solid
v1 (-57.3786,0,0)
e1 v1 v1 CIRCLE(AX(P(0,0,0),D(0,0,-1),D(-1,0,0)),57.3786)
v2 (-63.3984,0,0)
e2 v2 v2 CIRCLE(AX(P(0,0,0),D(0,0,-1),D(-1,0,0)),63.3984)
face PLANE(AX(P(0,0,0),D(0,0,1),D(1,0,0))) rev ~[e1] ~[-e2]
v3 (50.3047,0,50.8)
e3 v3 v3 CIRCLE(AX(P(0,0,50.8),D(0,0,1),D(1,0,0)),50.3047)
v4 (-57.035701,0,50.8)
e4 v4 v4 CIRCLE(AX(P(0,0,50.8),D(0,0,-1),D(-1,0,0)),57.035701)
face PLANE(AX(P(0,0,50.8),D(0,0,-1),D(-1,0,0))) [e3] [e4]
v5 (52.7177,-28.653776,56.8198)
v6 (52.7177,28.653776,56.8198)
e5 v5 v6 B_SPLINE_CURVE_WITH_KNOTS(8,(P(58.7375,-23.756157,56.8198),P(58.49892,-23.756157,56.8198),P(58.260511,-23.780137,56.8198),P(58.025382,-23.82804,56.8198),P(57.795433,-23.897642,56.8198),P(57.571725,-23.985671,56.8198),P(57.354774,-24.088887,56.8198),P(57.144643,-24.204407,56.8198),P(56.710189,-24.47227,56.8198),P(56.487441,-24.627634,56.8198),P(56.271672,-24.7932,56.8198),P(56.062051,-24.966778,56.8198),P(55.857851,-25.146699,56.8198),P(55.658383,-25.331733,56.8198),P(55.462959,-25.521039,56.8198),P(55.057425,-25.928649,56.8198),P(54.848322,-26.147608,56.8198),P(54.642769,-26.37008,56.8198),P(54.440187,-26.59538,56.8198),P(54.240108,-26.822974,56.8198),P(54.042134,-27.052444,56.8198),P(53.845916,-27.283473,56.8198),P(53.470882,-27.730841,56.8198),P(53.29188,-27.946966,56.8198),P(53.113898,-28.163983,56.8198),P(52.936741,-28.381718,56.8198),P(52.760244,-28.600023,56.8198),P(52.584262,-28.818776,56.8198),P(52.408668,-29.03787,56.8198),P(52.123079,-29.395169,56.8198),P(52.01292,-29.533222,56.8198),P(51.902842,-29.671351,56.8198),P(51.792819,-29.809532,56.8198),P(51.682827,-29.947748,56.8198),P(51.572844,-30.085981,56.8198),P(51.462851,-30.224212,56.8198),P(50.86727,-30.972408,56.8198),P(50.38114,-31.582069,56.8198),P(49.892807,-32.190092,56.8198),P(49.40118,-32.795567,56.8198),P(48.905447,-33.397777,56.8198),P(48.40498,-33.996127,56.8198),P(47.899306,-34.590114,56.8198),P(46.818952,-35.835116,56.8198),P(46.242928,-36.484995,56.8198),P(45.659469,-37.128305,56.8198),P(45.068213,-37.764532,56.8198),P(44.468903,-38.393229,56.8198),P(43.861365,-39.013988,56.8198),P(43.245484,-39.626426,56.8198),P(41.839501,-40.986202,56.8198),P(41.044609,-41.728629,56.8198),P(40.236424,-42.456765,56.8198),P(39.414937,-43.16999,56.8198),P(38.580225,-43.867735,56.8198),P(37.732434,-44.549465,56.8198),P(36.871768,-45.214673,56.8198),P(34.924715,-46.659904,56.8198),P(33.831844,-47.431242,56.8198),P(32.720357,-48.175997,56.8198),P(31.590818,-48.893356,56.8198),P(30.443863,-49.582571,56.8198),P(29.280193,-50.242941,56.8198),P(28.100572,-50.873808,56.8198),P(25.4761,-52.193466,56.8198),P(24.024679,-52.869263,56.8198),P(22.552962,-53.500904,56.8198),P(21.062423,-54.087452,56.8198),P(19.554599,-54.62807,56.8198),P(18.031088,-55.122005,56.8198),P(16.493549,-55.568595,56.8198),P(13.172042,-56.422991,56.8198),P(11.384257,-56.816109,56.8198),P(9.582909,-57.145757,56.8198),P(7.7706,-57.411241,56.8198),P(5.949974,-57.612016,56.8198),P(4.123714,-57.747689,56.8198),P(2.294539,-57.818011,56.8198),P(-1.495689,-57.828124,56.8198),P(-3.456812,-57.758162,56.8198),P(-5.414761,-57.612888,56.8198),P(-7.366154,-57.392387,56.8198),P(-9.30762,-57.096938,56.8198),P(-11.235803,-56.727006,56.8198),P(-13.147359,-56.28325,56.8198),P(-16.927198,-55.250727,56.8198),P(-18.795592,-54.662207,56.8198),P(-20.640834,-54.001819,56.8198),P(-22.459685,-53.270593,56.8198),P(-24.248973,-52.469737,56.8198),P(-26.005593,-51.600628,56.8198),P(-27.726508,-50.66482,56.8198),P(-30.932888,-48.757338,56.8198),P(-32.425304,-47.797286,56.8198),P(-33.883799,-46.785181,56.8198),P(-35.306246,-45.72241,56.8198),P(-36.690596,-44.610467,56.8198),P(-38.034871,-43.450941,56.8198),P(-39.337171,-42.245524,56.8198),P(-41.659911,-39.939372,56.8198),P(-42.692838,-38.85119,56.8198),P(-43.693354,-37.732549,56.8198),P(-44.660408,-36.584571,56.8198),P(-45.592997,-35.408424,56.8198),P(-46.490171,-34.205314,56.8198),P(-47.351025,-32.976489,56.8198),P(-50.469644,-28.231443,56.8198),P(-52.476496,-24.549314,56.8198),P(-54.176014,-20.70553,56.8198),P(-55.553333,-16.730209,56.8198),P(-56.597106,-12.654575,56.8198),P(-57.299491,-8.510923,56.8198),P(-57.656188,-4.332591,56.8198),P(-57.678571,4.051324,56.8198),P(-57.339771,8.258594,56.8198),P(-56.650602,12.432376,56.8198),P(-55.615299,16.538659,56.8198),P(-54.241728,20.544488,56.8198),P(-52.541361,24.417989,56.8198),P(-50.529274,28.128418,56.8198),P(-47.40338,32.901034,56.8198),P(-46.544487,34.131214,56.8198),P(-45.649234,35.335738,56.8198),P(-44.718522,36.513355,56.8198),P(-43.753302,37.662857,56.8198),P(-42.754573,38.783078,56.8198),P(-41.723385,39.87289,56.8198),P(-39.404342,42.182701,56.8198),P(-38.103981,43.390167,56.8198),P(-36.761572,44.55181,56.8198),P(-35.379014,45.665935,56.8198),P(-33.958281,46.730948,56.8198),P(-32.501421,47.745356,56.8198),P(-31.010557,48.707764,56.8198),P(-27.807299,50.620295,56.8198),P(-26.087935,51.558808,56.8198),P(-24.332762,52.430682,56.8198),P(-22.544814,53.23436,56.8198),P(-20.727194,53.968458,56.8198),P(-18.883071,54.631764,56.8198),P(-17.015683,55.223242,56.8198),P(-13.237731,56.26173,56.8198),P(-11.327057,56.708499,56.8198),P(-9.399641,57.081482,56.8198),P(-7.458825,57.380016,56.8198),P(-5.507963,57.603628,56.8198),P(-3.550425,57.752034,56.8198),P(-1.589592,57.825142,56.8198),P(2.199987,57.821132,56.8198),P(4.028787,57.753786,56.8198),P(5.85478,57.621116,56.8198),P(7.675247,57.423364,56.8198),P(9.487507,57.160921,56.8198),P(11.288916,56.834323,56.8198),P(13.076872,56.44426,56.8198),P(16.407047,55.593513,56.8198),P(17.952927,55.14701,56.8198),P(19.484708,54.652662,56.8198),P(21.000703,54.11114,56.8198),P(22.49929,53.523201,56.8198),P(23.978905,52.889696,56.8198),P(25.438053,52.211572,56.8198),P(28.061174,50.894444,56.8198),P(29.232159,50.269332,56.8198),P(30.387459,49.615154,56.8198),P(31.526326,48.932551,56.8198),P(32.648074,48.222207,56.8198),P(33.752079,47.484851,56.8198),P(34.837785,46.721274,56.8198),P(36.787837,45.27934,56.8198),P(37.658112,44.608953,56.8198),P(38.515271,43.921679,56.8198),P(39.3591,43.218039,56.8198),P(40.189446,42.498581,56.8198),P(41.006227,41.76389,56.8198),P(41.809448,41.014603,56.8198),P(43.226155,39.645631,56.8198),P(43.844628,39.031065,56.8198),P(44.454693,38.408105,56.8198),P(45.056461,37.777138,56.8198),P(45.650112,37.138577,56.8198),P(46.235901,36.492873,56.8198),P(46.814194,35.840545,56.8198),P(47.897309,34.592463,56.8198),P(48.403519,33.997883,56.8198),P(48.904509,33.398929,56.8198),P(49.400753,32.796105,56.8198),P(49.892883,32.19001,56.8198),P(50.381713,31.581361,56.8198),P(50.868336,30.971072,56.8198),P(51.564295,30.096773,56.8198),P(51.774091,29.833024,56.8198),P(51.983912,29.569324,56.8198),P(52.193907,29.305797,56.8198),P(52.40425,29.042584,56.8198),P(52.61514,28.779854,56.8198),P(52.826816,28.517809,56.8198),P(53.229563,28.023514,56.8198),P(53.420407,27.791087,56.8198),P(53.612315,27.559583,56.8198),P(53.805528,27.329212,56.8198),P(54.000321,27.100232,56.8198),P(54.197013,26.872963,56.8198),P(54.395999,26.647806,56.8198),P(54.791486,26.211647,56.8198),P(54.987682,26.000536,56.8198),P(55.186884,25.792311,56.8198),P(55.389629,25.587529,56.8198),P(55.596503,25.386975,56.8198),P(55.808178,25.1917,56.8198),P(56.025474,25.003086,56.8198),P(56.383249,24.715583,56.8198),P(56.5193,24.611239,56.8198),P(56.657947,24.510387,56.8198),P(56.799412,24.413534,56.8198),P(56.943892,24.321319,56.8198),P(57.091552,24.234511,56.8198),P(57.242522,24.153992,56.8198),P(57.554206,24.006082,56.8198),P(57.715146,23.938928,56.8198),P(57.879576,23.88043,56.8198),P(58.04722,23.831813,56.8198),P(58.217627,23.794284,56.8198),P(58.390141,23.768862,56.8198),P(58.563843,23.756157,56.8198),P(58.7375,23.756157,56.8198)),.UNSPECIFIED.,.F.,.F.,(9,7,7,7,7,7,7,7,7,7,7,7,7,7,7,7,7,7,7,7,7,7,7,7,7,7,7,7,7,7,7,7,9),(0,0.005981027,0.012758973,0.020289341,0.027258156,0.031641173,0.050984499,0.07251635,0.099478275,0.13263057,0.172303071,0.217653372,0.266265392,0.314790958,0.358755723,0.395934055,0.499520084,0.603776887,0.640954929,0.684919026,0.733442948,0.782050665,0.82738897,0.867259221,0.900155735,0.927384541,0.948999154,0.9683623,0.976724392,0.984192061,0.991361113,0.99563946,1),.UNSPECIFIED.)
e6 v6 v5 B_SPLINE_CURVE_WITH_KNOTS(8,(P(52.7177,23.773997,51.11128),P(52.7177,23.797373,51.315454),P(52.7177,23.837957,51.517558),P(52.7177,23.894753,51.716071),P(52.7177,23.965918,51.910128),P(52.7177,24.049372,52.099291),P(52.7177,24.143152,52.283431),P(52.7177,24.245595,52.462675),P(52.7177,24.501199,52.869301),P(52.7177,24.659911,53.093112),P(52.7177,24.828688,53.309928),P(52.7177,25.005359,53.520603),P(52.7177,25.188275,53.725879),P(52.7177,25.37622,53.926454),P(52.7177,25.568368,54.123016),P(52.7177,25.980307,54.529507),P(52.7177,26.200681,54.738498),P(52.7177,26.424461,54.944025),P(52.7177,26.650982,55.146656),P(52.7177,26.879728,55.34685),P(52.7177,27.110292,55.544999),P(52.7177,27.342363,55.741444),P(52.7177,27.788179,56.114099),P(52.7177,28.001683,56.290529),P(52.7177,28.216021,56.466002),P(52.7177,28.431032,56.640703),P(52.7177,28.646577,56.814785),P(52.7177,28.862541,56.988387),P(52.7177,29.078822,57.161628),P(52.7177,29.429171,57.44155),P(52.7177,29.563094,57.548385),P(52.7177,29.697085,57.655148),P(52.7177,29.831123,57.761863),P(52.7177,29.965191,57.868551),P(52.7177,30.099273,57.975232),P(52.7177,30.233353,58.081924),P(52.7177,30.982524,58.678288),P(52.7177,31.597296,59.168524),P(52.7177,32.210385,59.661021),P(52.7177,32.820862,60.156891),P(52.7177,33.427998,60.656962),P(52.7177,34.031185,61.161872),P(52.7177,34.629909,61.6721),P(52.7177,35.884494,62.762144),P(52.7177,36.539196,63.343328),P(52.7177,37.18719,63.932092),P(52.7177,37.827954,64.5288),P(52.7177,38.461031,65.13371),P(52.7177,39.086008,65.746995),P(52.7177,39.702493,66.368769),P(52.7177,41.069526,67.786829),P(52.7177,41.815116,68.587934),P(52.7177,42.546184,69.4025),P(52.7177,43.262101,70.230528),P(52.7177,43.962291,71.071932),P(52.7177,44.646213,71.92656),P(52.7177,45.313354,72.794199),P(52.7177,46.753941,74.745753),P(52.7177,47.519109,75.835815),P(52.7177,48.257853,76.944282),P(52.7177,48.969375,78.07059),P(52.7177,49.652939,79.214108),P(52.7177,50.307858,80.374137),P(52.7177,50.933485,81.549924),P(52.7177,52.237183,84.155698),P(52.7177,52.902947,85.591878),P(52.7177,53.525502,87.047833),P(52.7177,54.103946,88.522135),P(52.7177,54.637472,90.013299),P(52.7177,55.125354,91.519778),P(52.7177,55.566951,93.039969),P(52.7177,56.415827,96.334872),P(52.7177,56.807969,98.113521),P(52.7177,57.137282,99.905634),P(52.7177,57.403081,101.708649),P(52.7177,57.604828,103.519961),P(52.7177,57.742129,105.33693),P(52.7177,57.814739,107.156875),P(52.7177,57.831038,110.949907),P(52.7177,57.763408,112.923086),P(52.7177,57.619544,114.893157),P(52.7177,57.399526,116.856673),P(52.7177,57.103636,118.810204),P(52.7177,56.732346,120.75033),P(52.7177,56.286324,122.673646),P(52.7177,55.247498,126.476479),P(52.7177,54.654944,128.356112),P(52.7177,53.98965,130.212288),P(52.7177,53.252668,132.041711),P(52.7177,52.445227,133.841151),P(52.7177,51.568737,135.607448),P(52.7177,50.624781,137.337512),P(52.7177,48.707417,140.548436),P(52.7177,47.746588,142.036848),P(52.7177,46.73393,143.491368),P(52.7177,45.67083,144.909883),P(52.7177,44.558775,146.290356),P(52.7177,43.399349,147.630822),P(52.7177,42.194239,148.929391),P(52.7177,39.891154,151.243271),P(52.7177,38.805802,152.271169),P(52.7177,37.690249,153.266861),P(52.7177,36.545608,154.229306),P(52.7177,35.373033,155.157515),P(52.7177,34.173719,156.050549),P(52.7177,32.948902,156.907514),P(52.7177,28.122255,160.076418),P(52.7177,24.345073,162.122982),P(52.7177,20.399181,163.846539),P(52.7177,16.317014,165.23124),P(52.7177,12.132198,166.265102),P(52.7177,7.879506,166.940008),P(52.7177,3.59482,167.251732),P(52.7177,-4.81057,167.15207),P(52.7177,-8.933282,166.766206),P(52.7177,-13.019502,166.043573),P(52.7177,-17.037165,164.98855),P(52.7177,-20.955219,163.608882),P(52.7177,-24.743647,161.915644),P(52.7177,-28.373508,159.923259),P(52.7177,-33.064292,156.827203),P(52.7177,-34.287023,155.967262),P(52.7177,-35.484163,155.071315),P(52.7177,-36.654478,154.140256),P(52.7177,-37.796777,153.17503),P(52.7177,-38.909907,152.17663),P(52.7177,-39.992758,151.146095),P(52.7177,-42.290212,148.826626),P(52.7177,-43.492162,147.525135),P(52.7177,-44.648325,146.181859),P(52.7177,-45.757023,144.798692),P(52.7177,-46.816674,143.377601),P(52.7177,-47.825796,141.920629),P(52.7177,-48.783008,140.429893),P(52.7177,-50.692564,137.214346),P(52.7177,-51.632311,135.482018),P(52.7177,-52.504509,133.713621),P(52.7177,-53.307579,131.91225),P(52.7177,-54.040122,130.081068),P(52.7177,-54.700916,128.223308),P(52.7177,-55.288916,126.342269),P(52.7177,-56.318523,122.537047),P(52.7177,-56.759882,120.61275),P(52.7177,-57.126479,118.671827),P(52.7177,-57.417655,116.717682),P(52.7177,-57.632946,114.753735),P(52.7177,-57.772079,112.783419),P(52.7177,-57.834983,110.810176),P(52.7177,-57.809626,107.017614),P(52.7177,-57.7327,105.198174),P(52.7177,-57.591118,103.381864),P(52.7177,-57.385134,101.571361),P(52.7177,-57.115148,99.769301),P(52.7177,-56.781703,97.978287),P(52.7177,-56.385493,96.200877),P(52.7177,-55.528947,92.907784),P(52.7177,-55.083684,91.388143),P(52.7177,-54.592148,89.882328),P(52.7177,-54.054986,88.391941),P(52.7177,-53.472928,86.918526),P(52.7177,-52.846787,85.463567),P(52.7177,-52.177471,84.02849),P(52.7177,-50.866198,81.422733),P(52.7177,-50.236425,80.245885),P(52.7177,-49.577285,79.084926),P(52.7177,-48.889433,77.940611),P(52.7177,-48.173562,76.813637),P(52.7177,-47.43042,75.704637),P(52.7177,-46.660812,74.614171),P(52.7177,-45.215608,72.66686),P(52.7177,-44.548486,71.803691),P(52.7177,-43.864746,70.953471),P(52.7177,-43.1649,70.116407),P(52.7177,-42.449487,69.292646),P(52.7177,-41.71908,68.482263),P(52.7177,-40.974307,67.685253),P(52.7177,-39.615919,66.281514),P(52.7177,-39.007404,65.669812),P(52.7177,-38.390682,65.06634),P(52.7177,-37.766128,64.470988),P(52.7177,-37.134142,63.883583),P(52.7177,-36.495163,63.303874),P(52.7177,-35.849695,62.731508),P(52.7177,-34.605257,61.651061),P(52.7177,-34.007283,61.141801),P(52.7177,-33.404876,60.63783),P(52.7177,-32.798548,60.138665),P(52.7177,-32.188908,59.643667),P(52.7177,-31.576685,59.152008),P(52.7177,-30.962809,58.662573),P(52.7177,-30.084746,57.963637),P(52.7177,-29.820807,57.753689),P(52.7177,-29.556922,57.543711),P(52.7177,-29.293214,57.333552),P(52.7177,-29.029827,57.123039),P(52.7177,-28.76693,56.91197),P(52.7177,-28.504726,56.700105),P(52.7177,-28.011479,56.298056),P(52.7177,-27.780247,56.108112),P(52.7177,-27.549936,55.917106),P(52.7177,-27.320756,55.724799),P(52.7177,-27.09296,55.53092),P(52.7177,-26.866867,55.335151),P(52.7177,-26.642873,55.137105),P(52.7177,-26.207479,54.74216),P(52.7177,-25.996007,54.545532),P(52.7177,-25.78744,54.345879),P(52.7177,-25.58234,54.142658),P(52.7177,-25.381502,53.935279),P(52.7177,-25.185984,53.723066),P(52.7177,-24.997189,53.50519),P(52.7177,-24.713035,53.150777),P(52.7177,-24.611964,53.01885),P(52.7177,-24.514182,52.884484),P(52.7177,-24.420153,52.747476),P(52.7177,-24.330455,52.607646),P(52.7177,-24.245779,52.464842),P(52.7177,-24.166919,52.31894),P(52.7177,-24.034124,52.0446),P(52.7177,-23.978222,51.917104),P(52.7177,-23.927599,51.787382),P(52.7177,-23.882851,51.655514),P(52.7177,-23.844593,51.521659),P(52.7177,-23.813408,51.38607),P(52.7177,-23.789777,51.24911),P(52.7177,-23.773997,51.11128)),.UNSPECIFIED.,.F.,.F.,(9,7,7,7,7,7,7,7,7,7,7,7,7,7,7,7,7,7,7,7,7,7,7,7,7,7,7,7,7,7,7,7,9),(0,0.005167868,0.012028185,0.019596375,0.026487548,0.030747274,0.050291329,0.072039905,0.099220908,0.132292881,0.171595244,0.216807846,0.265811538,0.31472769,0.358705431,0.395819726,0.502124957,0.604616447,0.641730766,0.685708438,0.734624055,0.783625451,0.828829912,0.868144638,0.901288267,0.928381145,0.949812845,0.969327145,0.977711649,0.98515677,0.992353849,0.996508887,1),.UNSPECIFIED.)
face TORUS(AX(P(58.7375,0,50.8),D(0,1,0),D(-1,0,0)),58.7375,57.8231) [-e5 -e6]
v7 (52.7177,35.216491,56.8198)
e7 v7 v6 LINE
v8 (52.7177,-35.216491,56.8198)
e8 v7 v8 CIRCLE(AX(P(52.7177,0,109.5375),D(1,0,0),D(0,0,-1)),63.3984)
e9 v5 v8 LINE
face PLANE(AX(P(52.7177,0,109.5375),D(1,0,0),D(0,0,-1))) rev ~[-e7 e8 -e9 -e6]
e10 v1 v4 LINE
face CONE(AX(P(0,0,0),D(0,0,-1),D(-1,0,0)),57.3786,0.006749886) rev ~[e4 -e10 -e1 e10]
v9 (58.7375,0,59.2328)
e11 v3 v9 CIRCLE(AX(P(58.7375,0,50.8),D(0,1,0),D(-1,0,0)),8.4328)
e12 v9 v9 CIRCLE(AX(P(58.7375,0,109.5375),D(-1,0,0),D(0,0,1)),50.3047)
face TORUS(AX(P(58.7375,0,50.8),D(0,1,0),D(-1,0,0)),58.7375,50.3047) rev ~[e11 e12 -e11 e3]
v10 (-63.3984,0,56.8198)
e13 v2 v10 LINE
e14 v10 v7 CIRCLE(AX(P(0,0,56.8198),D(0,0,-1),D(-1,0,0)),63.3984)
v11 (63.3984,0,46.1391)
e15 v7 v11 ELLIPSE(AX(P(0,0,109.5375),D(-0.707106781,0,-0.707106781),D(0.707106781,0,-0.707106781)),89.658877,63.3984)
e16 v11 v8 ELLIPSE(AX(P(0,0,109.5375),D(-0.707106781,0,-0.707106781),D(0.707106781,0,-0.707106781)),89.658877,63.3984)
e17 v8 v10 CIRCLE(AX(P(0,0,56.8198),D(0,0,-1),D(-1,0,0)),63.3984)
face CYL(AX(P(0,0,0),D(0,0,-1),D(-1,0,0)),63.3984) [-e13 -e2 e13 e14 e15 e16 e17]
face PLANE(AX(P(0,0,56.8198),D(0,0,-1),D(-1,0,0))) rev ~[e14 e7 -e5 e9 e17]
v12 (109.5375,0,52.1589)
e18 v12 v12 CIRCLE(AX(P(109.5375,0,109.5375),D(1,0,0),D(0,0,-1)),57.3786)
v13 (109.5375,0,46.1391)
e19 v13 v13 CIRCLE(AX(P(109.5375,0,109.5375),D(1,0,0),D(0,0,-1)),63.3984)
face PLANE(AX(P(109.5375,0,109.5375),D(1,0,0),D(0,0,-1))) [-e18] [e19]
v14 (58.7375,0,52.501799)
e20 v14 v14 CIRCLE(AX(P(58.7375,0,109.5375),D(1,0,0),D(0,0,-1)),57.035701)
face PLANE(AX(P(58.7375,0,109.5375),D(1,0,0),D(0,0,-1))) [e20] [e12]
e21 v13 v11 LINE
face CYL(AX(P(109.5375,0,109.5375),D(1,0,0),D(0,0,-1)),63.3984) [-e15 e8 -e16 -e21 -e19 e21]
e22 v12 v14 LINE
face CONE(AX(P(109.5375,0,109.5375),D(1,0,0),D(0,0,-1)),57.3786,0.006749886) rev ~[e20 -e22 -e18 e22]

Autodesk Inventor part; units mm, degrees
ref_plane "YZ Plane" through (0, 0, 0) normal (1, 0, 0) x (0, 1, 0)
ref_plane "XZ Plane" through (0, 0, 0) normal (0, 1, 0) x (-1, 0, 0)
ref_plane "XY Plane" through (0, 0, 0) normal (0, 0, 1) x (1, 0, 0)
sketch "Sketch1" plane through (0, 0, 0) normal (0, 1, 0) x (-1, 0, 0)
  line L0 (0, 0) -> (0, 50.8)
  arc A0 (0, 50.8) -> (-58.7375, 109.5375) centre (-58.7375, 50.8) ccw
  line L1 (-58.7375, 109.5375) -> (-109.5375, 109.5375)
  line L2 (-58.7375, 109.5375) -> (0, 109.5375) construction
  line L3 (0, 109.5375) -> (0, 50.8) construction
  dimension "d0" = 109.5375
  dimension "d1" = 109.5375
  dimension "d2" = 50.8
sketch "Sketch2" plane through (0, 0, 0) normal (0, 0, 1) x (1, 0, 0)
  circle A0 centre (0, 0) radius 57.8231
  circle A1 centre (0, 0) radius 50.3047
  dimension "d3" = 100.6094
  dimension "d4" = 115.6462
sweep "Sweep1" add profiles "Sketch2" path "Sketch1"
sketch "Sketch3" plane through (0, 0, 0) normal (0, 0, -1) x (-1, 0, 0)
  circle A0 centre (0, 0) radius 63.3984
  circle A1 centre (0, 0) radius 57.8231 projected
  circle A2 centre (0, 0) radius 54.0639
  dimension "d6" = 126.7968
  dimension "d9" = 108.1278
extrude "Extrusion1" add sketch "Sketch3" against normal blind 56.8198 contours A0 | A1
sketch "Sketch4" plane through (109.5375, 0, 109.5375) normal (1, 0, 0) x (0, 0, -1)
  circle A0 centre (0, 0) radius 50.3047 projected
  circle A1 centre (0, 0) radius 54.0639
  circle A2 centre (0, 0) radius 63.3984
  dimension "d10" = 126.7968
  dimension "d11" = 108.1278
extrude "Extrusion2" add sketch "Sketch4" against normal blind 56.8198 contours A2
sketch "Sketch5" plane through (0, 0, 0) normal (0, 0, -1) x (-1, 0, 0)
  circle A0 centre (0, 0) radius 50.3047 projected
  circle A1 centre (0, 0) radius 57.3786
  dimension "d14" = 114.7572
sketch "Sketch5 outline for Extrusion3" plane through (0, 0, 0) normal (0, 0, -1) x (-1, 0, 0)
  circle A0 centre (0, 0) radius 57.3786
extrude "Extrusion3" cut sketch "Sketch5 outline for Extrusion3" against normal blind 50.8 draft -0.38674
sketch "Sketch6" plane through (109.5375, 0, 109.5375) normal (1, 0, 0) x (0, 0, -1)
  circle A0 centre (0, 0) radius 50.3047 projected
  circle A1 centre (0, 0) radius 57.3786
  dimension "d17" = 114.7572
sketch "Sketch6 outline for Extrusion4" plane through (109.5375, 0, 109.5375) normal (1, 0, 0) x (0, 0, -1)
  circle A0 centre (0, 0) radius 57.3786
extrude "Extrusion4" cut sketch "Sketch6 outline for Extrusion4" against normal blind 50.8 draft -0.38674
equation "\"d0\" = G + C1"
equation "\"d1\" = G + C1"
equation "\"d2\" = C1"
equation "\"d3\" = D"
equation "\"d4\" = D + 2 * F1"
equation "\"d6\" = A + 2 * E1"
equation "\"d9\" = D + F1"
equation "\"d7\" = C1 + E1"
equation "\"d10\" = A + 2 * E1"
equation "\"d11\" = D + F1"
equation "\"d12\" = C1 + E1"
equation "\"d14\" = A"
equation "\"d15\" = C1"
equation "\"d17\" = A"
equation "\"d18\" = C1"
equation "\"A\" = 114.7572"
equation "\"C1\" = 50.8"
equation "\"F1\" = 7.5184"
equation "\"D\" = 100.6094"
equation "\"G\" = 58.7375"
equation "\"E1\" = 6.0198"
equation "\"B\" = 114.0714"
properties part number "ASTM D 2466 90 Deg Elbow Socket-Type - Schedule 40 4" material "PVC-Piping"
